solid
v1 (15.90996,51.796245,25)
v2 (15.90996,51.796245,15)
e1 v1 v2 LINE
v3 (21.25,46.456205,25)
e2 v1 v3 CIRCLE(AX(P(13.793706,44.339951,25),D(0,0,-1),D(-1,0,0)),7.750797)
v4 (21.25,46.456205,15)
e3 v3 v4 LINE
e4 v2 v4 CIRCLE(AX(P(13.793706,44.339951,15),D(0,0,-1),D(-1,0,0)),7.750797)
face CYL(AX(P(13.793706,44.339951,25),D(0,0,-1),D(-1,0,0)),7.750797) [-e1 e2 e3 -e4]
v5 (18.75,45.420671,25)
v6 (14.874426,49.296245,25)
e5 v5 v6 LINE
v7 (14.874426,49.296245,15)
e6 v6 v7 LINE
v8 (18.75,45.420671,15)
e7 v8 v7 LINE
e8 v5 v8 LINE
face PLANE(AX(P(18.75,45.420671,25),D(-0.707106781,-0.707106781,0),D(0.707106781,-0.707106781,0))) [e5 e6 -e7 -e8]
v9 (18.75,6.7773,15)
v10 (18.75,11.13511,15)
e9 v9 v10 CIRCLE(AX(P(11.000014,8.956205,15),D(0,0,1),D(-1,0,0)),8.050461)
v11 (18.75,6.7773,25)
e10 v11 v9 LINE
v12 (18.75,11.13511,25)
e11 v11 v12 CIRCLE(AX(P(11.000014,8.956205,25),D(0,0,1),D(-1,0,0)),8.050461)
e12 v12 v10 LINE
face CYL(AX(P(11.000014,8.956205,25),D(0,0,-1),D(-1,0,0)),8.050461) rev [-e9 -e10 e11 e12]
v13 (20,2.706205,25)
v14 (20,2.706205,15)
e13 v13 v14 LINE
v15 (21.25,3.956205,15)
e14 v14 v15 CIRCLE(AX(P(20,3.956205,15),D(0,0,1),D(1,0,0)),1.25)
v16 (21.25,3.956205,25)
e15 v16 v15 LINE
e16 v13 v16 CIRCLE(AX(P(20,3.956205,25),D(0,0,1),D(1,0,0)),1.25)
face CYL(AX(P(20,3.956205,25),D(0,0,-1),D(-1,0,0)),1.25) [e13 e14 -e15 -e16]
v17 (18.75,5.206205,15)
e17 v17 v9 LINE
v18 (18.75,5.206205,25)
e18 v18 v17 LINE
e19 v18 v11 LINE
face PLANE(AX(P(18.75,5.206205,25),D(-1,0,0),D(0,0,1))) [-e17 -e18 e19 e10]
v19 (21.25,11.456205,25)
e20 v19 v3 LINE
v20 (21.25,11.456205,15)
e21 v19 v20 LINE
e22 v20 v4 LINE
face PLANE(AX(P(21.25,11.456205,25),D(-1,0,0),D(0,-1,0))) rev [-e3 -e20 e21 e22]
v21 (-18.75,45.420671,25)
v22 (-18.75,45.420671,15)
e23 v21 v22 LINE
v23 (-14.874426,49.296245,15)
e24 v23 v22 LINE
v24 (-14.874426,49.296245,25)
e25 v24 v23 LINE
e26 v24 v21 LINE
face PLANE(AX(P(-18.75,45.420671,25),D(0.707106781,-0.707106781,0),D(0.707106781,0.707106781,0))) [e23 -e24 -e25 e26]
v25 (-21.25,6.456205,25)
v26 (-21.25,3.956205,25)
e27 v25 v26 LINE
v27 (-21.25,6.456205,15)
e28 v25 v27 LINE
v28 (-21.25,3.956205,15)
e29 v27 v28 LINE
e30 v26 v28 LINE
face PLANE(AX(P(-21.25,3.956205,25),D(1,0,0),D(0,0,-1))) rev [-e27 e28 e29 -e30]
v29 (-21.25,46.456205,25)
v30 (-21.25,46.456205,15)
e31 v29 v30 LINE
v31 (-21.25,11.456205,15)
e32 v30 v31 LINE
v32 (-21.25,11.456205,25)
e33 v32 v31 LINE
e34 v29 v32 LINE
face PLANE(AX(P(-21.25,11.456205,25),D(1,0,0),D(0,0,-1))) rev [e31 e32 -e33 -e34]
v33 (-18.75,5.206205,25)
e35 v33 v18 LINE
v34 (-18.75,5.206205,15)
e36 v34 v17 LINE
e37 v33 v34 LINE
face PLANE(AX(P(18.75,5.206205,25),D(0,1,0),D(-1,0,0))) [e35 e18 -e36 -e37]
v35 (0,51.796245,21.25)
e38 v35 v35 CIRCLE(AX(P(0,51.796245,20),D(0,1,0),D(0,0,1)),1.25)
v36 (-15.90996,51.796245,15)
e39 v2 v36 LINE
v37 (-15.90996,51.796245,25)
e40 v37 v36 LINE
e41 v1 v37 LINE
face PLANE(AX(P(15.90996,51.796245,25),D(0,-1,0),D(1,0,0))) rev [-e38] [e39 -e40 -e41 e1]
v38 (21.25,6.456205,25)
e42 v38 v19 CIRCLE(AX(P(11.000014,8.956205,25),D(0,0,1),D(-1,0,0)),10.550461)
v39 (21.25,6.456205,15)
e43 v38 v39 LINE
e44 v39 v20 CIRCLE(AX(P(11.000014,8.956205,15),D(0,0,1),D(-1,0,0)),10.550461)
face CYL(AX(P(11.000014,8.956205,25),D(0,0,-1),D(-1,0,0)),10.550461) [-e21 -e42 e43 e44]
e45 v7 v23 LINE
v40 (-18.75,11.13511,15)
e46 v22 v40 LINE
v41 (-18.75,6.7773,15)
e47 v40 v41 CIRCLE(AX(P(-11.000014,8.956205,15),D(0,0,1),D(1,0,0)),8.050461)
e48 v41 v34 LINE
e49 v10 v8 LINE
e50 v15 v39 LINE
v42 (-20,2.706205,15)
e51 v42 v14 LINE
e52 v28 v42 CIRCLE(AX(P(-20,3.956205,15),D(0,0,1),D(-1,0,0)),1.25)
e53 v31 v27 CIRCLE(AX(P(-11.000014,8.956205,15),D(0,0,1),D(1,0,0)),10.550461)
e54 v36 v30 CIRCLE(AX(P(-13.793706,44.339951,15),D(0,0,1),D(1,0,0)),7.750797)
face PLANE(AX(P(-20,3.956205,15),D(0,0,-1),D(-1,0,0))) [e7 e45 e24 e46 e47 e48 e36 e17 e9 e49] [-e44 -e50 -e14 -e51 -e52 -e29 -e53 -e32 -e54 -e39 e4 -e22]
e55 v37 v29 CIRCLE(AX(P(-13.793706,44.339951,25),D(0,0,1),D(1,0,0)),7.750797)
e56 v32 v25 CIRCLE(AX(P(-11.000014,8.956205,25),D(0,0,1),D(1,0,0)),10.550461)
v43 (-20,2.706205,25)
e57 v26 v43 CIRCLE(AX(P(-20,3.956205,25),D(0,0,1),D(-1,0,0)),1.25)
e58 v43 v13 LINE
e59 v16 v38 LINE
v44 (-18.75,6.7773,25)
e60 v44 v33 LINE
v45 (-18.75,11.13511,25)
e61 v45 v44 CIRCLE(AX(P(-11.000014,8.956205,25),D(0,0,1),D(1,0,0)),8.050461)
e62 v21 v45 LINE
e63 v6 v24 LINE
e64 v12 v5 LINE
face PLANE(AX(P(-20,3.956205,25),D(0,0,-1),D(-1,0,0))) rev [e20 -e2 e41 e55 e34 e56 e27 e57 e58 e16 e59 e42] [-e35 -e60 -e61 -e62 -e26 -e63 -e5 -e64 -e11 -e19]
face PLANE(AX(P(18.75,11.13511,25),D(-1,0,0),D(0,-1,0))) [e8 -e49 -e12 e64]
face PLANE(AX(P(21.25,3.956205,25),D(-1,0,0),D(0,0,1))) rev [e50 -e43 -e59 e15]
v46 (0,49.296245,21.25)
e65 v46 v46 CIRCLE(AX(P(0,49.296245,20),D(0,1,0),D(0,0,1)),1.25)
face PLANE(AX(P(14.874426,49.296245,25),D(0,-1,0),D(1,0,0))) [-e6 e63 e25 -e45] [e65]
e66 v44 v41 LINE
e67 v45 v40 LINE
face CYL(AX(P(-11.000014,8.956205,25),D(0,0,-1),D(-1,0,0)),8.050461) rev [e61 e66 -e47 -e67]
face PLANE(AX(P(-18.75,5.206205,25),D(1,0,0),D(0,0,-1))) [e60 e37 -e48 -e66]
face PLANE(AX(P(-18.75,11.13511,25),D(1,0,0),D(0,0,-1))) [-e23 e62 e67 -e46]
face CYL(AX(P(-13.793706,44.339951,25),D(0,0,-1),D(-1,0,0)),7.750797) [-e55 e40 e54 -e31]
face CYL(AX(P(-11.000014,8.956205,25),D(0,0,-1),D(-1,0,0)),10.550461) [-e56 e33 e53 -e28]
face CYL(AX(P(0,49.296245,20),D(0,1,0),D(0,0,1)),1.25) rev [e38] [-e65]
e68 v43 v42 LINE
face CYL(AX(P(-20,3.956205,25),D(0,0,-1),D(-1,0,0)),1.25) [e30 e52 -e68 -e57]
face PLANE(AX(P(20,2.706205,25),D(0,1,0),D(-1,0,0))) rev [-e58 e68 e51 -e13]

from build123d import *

# Parameters (mm, degrees)
BOSS_EXTRU_1_DEPTH      = 40
EPAISSIR2_DEPTH         = 40
EPAISSIR3_DEPTH         = 40
ESQUISSE11_R            = 5
ENL_V_MAT_EXTRU_1_DEPTH = 10
ECHELLE1_SCALE          = 0.25


# Read off the part's stored shape, not the designer's step: Epaissir2, Epaissir3
with BuildPart() as part:
    # Esquisse1 → Boss.-Extru.1 (new body)
    with BuildSketch(Plane.XY):
        with BuildLine():
            Line((-85, 105), (-63.639838362, 126.360161638))
            Line((-63.639838362, 126.360161638), (63.639838362, 126.360161638))
            Line((63.639838362, 126.360161638), (85, 105))
            Line((85, 105), (85, -35))
            ThreePointArc((85, -35), (86.201897264, -45), (85, -55))
            Line((85, -55), (85, -65))
            ThreePointArc((85, -65), (83.535533906, -68.535533906), (80, -70))
            Line((80, -70), (-80, -70))
            ThreePointArc((-80, -70), (-83.535533906, -68.535533906), (-85, -65))
            Line((-85, -65), (-85, -55))
            ThreePointArc((-85, -55), (-86.201897264, -45), (-85, -35))
            Line((-85, -35), (-85, 105))
        make_face()
        with BuildLine():
            Line((75, 100.857864376), (59.497702738, 116.360161638))
            Line((59.497702738, 116.360161638), (-59.497702738, 116.360161638))
            Line((-59.497702738, 116.360161638), (-75, 100.857864376))
            Line((-75, 100.857864376), (-75, -36.284378696))
            ThreePointArc((-75, -36.284378696), (-76.201897264, -45), (-75, -53.715621304))
            Line((-75, -53.715621304), (-75, -60))
            Line((-75, -60), (75, -60))
            Line((75, -60), (75, -53.715621304))
            ThreePointArc((75, -53.715621304), (76.201897264, -45), (75, -36.284378696))
            Line((75, -36.284378696), (75, 100.857864376))
        make_face(mode=Mode.SUBTRACT)
    extrude(amount=BOSS_EXTRU_1_DEPTH)

    # Epaissir2 outline → Epaissir2 (add)
    with BuildSketch(Plane.XY):
        with BuildLine():
            ThreePointArc((-63.639838362, 126.360161638), (-77.097387468, 118.457549106), (-85, 105))
            Line((-85, 105), (-63.639838362, 126.360161638))
        make_face()
    extrude(amount=EPAISSIR2_DEPTH)

    # Epaissir3 outline → Epaissir3 (add)
    with BuildSketch(Plane.XY):
        with BuildLine():
            ThreePointArc((85, 105), (77.097387468, 118.457549106), (63.639838362, 126.360161638))
            Line((63.639838362, 126.360161638), (85, 105))
        make_face()
    extrude(amount=EPAISSIR3_DEPTH)

    # Esquisse11 → Enlèv. mat.-Extru.1 (cut)
    with BuildSketch(Plane(origin=(0, 126.360161638, 0), x_dir=(1, 0, 0), z_dir=(0, 1, 0))):
        with Locations(Location((0, -20, 0), (0, 0, 270))):
            Circle(ESQUISSE11_R)
    extrude(amount=-ENL_V_MAT_EXTRU_1_DEPTH, mode=Mode.SUBTRACT)


with BuildPart() as part_1:
    # Echelle1: scaled about (0, 26.941606469, 20)
    add(part.part.scale(ECHELLE1_SCALE).moved(Location((0, 20.206204852, 15))))


solid = part_1.part
